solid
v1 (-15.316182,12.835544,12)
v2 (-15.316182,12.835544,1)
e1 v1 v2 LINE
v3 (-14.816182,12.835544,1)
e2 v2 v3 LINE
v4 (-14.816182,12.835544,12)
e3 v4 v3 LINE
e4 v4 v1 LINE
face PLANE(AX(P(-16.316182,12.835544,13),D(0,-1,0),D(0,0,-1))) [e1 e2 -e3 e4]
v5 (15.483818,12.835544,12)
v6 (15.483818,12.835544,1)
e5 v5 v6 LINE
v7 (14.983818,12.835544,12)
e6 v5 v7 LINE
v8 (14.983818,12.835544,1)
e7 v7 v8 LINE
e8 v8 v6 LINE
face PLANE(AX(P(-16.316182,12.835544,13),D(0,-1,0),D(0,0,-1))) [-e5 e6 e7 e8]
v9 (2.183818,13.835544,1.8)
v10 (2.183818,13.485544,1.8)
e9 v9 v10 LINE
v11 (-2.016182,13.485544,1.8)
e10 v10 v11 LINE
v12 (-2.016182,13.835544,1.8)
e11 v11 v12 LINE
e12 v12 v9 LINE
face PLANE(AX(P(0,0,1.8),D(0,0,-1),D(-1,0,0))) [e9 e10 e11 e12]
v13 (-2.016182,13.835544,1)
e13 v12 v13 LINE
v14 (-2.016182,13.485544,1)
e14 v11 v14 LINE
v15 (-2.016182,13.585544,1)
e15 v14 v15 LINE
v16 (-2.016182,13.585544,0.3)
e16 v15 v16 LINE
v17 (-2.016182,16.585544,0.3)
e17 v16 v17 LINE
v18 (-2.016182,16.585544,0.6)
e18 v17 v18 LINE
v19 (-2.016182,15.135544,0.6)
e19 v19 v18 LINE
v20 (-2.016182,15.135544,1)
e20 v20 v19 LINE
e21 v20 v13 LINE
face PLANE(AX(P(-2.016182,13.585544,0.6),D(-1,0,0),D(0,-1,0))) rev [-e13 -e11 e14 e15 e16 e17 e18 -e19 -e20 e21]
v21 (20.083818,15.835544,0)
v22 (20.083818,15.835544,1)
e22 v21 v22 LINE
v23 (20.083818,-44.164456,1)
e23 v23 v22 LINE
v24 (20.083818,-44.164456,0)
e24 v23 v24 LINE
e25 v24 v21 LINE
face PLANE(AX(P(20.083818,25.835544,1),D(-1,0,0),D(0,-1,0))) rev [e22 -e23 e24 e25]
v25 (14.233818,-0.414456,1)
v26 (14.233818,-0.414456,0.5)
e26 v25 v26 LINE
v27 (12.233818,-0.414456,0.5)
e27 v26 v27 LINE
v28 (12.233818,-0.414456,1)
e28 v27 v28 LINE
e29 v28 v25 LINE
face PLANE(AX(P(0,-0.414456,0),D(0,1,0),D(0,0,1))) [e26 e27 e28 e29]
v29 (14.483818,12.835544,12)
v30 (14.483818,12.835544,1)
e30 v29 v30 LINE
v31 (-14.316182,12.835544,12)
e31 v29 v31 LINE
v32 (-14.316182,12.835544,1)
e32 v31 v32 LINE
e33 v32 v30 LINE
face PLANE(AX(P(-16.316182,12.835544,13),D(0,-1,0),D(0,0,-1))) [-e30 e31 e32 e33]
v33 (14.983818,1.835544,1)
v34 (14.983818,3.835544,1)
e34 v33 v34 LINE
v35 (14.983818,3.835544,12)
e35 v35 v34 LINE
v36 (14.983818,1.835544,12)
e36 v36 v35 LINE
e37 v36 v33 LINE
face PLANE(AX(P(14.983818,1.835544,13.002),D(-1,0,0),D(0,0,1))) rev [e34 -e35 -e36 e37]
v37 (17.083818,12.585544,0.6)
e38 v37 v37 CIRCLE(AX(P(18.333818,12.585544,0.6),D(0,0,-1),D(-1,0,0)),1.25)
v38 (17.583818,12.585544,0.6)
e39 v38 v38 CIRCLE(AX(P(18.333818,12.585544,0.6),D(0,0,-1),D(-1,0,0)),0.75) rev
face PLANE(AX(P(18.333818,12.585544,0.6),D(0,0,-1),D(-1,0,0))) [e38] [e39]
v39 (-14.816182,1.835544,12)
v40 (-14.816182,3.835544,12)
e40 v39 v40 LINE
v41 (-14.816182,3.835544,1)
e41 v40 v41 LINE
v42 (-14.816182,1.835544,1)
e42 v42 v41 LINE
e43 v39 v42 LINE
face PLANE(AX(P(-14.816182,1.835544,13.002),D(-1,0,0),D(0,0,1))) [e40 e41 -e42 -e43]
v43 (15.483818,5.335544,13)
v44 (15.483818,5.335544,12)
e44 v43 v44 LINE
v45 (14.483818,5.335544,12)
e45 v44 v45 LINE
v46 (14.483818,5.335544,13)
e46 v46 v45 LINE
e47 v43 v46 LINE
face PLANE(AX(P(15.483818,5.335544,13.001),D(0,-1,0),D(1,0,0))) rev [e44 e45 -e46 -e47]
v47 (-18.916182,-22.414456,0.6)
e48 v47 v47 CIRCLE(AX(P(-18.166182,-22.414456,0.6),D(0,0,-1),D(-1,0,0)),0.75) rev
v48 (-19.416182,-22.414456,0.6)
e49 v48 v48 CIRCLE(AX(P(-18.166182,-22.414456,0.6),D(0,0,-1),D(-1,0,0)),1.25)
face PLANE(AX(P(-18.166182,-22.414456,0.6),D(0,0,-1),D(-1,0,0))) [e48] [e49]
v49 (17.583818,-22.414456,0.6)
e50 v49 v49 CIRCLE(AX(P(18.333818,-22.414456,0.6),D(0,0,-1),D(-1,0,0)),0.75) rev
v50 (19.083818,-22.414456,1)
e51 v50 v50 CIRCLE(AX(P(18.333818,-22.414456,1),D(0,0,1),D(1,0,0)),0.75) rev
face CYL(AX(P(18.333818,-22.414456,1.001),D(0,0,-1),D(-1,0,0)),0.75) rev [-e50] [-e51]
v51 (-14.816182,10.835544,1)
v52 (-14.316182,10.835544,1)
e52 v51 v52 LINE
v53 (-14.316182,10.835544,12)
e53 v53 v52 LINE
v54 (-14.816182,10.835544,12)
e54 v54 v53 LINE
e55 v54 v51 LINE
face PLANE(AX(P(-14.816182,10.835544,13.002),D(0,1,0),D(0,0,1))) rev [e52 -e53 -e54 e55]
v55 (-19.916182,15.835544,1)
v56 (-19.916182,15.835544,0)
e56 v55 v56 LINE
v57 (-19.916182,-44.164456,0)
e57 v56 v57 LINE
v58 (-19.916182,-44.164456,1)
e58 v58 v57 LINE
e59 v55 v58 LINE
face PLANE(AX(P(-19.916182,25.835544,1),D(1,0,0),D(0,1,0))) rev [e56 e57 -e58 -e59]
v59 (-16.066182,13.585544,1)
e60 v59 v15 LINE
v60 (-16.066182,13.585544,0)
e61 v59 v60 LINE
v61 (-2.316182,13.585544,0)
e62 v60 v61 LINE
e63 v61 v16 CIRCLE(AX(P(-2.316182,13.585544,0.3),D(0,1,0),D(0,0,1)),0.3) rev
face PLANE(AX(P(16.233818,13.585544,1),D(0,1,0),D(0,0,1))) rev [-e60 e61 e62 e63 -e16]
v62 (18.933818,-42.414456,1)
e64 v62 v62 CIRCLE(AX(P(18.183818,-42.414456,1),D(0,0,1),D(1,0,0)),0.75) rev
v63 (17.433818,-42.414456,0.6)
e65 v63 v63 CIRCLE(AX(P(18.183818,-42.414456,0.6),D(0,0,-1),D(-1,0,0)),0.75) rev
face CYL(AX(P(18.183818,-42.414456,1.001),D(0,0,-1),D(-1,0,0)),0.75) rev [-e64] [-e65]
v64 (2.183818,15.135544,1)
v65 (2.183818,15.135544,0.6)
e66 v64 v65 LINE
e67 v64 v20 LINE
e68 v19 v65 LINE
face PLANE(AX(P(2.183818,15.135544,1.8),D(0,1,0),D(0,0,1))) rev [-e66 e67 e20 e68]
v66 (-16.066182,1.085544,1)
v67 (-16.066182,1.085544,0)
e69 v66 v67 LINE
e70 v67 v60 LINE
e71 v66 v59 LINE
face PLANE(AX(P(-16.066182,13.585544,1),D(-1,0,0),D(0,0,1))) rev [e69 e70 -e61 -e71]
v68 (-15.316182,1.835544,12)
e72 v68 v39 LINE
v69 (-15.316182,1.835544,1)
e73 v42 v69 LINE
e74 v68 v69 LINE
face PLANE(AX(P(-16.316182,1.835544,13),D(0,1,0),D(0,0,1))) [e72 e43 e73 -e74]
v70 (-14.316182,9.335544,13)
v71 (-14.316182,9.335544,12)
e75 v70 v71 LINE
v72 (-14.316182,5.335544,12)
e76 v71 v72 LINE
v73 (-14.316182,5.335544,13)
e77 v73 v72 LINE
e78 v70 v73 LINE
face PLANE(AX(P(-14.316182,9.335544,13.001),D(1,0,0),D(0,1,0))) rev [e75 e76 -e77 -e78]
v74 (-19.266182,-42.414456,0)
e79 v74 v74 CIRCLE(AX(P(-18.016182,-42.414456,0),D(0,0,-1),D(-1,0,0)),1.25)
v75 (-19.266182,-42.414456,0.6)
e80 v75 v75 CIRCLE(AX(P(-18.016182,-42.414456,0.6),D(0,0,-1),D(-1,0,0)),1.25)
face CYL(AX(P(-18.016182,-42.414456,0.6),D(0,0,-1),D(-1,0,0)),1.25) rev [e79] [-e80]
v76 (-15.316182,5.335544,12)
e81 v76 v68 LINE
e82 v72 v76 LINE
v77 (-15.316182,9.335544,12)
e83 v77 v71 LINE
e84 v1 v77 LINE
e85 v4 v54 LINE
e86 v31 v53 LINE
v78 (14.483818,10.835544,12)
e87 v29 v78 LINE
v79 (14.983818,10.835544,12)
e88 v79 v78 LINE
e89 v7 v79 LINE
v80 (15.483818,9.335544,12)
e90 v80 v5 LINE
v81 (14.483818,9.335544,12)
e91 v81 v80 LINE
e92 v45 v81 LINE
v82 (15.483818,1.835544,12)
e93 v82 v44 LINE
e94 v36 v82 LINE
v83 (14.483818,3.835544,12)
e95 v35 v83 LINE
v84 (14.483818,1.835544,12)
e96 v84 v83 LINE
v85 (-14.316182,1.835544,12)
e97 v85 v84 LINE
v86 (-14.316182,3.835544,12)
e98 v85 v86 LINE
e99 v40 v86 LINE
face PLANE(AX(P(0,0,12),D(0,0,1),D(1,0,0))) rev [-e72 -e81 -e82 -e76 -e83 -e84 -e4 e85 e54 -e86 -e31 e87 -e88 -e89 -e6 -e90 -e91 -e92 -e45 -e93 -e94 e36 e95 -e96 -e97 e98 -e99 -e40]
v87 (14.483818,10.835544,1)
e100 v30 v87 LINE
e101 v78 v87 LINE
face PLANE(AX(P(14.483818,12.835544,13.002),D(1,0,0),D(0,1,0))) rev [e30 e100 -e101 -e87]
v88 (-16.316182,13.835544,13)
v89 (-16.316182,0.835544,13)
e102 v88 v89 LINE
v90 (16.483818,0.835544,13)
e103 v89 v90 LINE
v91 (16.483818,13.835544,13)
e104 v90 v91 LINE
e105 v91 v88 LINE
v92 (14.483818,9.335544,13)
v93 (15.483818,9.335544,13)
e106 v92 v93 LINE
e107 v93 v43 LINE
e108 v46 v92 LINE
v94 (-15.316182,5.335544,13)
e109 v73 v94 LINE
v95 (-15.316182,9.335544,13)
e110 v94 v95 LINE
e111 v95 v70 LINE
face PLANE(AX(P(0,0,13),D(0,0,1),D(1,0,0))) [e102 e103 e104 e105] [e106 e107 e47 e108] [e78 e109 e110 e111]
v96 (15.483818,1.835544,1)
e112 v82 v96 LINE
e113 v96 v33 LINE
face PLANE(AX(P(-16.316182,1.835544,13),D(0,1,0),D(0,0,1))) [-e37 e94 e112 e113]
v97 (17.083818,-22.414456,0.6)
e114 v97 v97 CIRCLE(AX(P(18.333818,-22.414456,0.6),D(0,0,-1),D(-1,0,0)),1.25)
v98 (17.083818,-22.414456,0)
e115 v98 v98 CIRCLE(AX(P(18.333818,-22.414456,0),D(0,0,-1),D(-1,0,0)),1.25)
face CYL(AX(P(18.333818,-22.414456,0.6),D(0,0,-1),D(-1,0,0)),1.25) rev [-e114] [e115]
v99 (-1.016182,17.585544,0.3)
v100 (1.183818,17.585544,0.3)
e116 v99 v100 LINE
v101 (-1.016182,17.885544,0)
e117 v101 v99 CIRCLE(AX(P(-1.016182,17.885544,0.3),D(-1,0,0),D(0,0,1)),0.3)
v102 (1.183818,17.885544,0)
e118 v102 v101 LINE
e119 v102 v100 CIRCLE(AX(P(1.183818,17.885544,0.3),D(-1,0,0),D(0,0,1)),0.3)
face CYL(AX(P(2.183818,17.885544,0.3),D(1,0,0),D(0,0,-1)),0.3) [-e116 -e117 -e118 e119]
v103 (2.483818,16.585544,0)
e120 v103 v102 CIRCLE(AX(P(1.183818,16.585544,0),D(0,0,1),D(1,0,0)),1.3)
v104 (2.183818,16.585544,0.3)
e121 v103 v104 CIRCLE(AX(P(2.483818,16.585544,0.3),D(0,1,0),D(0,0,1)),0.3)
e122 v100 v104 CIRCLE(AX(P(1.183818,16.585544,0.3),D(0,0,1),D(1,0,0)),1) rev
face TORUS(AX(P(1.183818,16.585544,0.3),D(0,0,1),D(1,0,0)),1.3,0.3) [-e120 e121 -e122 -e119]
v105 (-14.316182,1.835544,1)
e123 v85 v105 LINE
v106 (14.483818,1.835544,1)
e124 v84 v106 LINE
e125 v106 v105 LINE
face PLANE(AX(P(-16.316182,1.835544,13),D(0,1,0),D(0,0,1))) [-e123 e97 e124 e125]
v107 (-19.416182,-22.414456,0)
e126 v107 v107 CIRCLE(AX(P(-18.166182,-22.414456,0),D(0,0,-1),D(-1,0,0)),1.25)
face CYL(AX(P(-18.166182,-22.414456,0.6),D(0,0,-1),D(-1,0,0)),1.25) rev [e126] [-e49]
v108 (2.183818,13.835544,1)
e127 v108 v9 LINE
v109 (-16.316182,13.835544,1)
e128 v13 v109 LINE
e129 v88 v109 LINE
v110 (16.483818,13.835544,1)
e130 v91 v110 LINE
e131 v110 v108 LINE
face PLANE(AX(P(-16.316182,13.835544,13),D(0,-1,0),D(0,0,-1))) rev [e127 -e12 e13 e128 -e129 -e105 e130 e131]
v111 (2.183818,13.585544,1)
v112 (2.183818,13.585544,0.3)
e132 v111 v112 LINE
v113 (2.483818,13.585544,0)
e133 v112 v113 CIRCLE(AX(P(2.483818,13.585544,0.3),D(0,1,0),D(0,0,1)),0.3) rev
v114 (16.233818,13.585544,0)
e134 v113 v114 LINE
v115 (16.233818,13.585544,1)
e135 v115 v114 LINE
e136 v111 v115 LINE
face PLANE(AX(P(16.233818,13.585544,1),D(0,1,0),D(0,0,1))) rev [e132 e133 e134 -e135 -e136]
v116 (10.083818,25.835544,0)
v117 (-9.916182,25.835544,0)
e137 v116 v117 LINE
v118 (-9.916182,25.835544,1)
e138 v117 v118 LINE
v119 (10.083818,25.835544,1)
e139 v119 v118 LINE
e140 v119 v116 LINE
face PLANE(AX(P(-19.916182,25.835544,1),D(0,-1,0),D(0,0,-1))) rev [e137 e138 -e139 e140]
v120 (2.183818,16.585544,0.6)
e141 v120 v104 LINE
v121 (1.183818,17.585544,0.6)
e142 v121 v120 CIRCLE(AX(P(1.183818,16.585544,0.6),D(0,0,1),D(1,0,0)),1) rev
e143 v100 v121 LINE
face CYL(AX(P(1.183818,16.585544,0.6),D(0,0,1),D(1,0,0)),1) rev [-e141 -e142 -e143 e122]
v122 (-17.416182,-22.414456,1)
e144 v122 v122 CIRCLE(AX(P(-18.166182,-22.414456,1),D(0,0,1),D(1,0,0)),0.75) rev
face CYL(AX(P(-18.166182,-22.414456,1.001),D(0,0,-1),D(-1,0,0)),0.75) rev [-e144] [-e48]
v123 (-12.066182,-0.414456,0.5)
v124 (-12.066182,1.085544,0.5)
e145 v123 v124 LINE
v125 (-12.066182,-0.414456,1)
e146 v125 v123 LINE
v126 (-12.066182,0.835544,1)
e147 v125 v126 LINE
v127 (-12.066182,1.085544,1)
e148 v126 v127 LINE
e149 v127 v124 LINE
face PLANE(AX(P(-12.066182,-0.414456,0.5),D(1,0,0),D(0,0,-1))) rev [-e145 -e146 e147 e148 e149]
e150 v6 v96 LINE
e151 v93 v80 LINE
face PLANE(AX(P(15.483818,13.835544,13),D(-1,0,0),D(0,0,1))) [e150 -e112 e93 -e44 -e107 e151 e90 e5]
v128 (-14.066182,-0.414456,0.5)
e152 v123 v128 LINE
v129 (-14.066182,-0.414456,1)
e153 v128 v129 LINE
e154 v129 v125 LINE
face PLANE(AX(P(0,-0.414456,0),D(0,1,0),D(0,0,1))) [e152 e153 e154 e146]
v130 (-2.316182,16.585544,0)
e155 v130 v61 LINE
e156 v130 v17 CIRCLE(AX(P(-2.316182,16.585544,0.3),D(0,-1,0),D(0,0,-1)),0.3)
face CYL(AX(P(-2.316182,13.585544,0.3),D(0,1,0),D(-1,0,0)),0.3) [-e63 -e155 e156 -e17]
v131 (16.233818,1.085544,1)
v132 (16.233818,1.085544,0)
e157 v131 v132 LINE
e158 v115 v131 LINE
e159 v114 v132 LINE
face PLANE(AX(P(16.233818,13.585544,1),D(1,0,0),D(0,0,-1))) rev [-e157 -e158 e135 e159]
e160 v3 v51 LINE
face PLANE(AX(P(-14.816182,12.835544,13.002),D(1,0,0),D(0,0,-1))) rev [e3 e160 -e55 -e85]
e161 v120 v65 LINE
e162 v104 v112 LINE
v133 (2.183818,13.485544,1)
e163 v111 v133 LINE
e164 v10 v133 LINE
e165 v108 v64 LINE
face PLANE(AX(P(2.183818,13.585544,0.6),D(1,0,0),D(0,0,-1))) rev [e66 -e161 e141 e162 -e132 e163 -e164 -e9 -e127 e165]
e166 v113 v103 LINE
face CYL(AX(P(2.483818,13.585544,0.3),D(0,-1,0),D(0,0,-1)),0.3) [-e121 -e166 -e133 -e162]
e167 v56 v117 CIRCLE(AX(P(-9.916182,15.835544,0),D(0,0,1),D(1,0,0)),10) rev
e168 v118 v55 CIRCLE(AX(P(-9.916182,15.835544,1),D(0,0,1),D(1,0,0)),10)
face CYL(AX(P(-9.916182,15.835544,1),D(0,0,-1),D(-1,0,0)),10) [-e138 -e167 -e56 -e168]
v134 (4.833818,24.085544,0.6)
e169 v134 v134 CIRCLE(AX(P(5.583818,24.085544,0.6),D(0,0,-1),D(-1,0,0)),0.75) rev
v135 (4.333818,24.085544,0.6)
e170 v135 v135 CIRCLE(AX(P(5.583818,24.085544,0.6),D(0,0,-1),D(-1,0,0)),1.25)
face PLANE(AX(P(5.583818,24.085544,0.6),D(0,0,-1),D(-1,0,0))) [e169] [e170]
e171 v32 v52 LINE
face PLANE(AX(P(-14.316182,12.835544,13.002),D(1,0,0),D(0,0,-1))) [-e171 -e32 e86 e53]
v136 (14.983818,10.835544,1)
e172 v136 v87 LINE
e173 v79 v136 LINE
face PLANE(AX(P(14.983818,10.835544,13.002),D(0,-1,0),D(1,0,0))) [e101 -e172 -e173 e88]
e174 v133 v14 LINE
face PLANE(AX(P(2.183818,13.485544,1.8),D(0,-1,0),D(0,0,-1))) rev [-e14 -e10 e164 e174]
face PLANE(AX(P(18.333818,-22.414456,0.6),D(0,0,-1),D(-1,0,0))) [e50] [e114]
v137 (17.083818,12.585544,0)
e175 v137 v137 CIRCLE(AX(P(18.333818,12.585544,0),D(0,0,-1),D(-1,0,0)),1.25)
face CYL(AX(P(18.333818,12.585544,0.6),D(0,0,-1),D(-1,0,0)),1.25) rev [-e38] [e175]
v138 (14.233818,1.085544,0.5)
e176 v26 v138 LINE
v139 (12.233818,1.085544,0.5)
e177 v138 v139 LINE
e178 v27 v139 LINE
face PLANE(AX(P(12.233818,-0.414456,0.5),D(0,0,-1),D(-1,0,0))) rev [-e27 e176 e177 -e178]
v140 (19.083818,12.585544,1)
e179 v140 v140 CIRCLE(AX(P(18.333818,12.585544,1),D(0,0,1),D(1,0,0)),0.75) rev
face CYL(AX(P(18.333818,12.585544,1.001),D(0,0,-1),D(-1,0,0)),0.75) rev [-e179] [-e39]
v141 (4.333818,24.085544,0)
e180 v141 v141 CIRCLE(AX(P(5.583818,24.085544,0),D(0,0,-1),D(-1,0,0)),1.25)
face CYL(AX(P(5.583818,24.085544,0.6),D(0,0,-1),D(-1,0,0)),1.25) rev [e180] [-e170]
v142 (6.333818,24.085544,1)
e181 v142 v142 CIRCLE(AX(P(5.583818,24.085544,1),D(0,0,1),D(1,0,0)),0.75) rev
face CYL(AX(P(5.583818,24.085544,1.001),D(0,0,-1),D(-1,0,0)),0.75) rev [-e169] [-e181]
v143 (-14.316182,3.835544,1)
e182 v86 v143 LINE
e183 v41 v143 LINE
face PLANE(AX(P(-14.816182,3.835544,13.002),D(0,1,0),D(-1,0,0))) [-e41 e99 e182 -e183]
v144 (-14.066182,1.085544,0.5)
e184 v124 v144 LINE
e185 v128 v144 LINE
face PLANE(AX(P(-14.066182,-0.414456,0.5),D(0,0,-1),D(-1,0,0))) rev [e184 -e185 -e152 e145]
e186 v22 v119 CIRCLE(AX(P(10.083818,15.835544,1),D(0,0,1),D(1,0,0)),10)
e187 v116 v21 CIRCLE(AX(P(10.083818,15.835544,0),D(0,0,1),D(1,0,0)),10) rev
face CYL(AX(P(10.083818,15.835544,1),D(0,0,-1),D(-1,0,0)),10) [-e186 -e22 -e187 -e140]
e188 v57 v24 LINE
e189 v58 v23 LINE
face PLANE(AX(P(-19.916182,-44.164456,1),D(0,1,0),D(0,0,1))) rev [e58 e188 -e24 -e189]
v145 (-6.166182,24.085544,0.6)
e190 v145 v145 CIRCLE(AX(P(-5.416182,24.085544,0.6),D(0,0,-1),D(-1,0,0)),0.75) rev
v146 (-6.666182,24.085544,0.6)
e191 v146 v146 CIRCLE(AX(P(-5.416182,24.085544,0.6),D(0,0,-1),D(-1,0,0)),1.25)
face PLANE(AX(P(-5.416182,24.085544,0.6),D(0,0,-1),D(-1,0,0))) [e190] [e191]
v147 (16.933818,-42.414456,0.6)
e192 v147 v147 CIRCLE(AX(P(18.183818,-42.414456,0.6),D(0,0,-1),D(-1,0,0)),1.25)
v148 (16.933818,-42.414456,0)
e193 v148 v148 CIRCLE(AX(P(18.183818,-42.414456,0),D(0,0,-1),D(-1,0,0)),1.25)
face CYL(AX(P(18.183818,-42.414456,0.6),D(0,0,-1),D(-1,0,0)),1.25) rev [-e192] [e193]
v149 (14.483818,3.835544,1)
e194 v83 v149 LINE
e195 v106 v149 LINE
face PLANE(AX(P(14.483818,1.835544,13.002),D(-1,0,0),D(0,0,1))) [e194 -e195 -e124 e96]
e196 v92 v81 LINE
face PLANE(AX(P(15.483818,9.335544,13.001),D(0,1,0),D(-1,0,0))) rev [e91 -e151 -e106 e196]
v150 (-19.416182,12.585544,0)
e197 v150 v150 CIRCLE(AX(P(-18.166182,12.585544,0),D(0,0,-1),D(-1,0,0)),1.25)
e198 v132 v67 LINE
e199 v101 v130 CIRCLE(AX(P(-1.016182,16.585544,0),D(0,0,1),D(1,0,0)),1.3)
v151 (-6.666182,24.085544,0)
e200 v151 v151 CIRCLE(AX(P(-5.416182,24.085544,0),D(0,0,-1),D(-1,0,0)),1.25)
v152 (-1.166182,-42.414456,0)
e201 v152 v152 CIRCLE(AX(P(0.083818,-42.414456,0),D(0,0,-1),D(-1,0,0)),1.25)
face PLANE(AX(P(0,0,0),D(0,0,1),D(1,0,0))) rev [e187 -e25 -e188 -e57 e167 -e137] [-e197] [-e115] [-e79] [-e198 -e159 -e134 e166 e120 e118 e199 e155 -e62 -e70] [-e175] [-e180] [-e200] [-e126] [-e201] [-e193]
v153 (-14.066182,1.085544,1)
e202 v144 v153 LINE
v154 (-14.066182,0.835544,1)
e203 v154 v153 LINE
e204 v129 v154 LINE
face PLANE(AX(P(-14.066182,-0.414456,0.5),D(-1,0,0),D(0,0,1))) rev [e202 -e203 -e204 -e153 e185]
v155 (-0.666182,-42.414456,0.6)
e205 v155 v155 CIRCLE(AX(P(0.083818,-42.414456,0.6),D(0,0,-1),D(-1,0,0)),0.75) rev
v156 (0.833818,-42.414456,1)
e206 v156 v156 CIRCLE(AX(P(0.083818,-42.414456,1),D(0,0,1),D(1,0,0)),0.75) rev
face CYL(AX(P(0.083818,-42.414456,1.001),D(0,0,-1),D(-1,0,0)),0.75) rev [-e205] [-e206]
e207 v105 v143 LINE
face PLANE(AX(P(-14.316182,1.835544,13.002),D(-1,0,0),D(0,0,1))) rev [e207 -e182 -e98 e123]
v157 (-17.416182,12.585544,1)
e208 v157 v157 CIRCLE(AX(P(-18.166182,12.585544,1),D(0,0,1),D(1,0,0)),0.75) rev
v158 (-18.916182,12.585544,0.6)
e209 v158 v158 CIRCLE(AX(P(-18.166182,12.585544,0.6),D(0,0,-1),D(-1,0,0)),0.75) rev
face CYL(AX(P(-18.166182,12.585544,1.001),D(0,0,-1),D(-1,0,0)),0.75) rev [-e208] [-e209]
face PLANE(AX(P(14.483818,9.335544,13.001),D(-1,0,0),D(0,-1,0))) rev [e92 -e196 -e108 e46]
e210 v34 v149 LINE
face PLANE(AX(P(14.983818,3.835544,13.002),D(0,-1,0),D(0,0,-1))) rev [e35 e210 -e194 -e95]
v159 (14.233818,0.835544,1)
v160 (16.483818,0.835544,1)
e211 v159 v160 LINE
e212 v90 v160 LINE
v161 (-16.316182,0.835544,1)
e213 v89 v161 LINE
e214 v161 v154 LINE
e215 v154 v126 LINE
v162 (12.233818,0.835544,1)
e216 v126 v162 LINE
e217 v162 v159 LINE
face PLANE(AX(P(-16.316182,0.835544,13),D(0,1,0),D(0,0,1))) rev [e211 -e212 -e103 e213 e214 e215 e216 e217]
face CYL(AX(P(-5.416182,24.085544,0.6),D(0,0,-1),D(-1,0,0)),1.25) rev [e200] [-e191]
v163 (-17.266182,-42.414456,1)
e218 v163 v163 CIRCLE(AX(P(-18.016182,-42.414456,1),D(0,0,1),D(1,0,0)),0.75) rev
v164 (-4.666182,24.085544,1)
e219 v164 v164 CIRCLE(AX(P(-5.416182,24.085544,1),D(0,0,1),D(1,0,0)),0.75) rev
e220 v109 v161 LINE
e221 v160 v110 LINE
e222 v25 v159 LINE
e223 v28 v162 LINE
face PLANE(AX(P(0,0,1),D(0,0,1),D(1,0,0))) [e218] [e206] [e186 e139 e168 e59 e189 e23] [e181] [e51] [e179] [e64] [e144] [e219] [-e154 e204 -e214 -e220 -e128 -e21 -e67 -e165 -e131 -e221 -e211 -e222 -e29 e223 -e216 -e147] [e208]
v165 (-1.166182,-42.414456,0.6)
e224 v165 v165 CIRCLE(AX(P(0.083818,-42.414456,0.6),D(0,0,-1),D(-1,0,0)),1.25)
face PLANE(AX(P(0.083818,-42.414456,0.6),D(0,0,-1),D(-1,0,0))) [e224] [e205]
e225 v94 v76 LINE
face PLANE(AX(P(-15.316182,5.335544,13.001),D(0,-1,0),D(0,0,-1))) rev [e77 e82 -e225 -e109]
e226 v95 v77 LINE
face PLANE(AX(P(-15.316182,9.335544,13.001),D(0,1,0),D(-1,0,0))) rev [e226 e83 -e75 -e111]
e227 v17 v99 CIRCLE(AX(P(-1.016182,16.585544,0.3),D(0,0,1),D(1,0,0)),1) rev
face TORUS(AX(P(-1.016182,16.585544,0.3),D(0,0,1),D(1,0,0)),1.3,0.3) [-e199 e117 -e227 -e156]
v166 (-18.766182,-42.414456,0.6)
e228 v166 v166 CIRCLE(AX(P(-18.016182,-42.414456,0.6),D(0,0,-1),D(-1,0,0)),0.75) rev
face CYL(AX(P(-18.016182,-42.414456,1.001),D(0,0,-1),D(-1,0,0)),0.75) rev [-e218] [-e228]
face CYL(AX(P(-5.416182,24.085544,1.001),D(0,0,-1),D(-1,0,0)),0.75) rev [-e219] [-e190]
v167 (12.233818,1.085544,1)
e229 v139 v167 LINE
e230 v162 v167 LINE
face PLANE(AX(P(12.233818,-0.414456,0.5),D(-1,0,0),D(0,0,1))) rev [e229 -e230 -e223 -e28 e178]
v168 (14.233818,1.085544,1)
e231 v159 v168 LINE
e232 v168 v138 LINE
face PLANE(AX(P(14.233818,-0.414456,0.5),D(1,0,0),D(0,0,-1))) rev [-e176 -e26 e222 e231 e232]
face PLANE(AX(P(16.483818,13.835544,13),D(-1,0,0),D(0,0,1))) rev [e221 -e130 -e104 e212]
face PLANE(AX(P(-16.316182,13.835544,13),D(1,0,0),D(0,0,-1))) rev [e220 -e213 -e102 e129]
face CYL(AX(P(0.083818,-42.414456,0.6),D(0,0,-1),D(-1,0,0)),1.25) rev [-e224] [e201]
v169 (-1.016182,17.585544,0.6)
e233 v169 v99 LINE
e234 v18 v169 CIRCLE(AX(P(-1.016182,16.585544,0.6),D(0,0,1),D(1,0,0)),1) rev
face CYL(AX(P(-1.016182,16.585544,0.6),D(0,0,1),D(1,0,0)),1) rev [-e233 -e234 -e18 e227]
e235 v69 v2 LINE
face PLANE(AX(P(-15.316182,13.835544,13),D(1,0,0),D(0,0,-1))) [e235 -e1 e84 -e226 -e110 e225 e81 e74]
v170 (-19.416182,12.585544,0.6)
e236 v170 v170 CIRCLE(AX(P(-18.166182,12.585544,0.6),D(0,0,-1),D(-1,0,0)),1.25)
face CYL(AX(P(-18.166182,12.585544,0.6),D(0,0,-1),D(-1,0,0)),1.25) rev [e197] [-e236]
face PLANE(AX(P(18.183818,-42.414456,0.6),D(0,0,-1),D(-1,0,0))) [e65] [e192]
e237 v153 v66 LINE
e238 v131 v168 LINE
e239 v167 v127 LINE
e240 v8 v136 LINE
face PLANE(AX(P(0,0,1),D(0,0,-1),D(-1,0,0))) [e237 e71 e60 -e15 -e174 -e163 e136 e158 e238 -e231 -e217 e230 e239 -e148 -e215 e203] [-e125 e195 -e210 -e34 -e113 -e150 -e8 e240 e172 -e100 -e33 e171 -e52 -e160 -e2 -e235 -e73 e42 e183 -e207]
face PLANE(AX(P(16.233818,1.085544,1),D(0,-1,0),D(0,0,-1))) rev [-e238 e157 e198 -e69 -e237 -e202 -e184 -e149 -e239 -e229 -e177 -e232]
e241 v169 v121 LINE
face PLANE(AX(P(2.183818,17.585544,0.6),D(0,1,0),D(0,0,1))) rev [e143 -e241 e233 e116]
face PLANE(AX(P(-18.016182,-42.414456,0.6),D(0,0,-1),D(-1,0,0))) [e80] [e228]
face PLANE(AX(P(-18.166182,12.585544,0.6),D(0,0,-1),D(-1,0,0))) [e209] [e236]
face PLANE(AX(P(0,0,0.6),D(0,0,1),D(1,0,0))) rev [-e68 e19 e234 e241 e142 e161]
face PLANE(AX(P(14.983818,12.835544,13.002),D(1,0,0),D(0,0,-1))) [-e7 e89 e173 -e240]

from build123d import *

# Parameters (mm, degrees)
CROQUIS1_W              = 40
CROQUIS1_H              = 70
SALIENTE_EXTRUIR1_DEPTH = 1
REDONDEO1_R             = 10
CORTAR_EXTRUIR1_REACH   = 50.527
CROQUIS2_R              = 0.75
CROQUIS5_W              = 32.8
CROQUIS5_H              = 13
SALIENTE_EXTRUIR2_DEPTH = 12
VACIADO1_START          = -15.316182085
VACIADO1_OUTLINE_W      = 11
VACIADO1_OUTLINE_H      = 12
VACIADO1_DEPTH          = 30.8
CORTAR_EXTRUIR4_REACH   = 51.979
CROQUIS6_W              = 1
CROQUIS6_H              = 4
CROQUIS7_W              = 32.3
CROQUIS7_H              = 12.5
CORTAR_EXTRUIR5_DEPTH   = 1
CROQUIS8_W              = 4.2
CROQUIS8_H              = 4
CORTAR_EXTRUIR6_DEPTH   = 0.6
REDONDEO2_R             = 1
REDONDEO3_R             = 0.3
CROQUIS9_W              = 4.2
CROQUIS9_H              = 1.65
CORTAR_EXTRUIR7_DEPTH   = 1.2
CROQUIS10_W             = 2
CROQUIS10_H             = 0.5
CORTAR_EXTRUIR8_DEPTH   = 1.5
CROQUIS11_R             = 1.25
CORTAR_EXTRUIR9_DEPTH   = 0.6
SALIENTE_EXTRUIR3_REACH = 51.979
CROQUIS12_W             = 0.5
CROQUIS12_H             = 2


# Read off the part's stored shape, not the designer's step: Vaciado1
with BuildPart() as part:
    # Croquis1 → Saliente-Extruir1 (new body)
    with BuildSketch(Plane.XY):
        with Locations((0.083817915, -9.164456233)):
            Rectangle(CROQUIS1_W, CROQUIS1_H)
    extrude(amount=SALIENTE_EXTRUIR1_DEPTH)

    # Redondeo1
    redondeo1_edges = [part.edges().sort_by_distance(p)[0] for p in [
        (-19.916182085, 25.835543767, 0.5),
        (20.083817915, 25.835543767, 0.5),
    ]]
    fillet(redondeo1_edges, radius=REDONDEO1_R)

    # Croquis2 → Cortar-Extruir1 (cut, up to next)
    with BuildSketch(Plane(origin=(0, 0, 0), x_dir=(-1, 0, 0), z_dir=(0, 0, -1)), mode=Mode.PRIVATE) as cortar_extruir1_sk1:
        with Locations((-5.583817915, 24.085543767)):
            Circle(CROQUIS2_R)
    cortar_extruir1_tool1 = extrude(cortar_extruir1_sk1.sketch, amount=-CORTAR_EXTRUIR1_REACH, mode=Mode.PRIVATE) & part.part
    # Croquis2 → Cortar-Extruir1 (cut, up to next)
    with BuildSketch(Plane(origin=(0, 0, 0), x_dir=(-1, 0, 0), z_dir=(0, 0, -1)), mode=Mode.PRIVATE) as cortar_extruir1_sk2:
        with Locations((5.416182085, 24.085543767)):
            Circle(CROQUIS2_R)
    cortar_extruir1_tool2 = extrude(cortar_extruir1_sk2.sketch, amount=-CORTAR_EXTRUIR1_REACH, mode=Mode.PRIVATE) & part.part
    # Croquis2 → Cortar-Extruir1 (cut, up to next)
    with BuildSketch(Plane(origin=(0, 0, 0), x_dir=(-1, 0, 0), z_dir=(0, 0, -1)), mode=Mode.PRIVATE) as cortar_extruir1_sk3:
        with Locations((-18.183817915, -42.414456233)):
            Circle(CROQUIS2_R)
    cortar_extruir1_tool3 = extrude(cortar_extruir1_sk3.sketch, amount=-CORTAR_EXTRUIR1_REACH, mode=Mode.PRIVATE) & part.part
    # Croquis2 → Cortar-Extruir1 (cut, up to next)
    with BuildSketch(Plane(origin=(0, 0, 0), x_dir=(-1, 0, 0), z_dir=(0, 0, -1)), mode=Mode.PRIVATE) as cortar_extruir1_sk4:
        with Locations((-0.083817915, -42.414456233)):
            Circle(CROQUIS2_R)
    cortar_extruir1_tool4 = extrude(cortar_extruir1_sk4.sketch, amount=-CORTAR_EXTRUIR1_REACH, mode=Mode.PRIVATE) & part.part
    # Croquis2 → Cortar-Extruir1 (cut, up to next)
    with BuildSketch(Plane(origin=(0, 0, 0), x_dir=(-1, 0, 0), z_dir=(0, 0, -1)), mode=Mode.PRIVATE) as cortar_extruir1_sk5:
        with Locations((18.016182085, -42.414456233)):
            Circle(CROQUIS2_R)
    cortar_extruir1_tool5 = extrude(cortar_extruir1_sk5.sketch, amount=-CORTAR_EXTRUIR1_REACH, mode=Mode.PRIVATE) & part.part
    # Croquis2 → Cortar-Extruir1 (cut, up to next)
    with BuildSketch(Plane(origin=(0, 0, 0), x_dir=(-1, 0, 0), z_dir=(0, 0, -1)), mode=Mode.PRIVATE) as cortar_extruir1_sk6:
        with Locations((-18.333817915, 12.585543767)):
            Circle(CROQUIS2_R)
    cortar_extruir1_tool6 = extrude(cortar_extruir1_sk6.sketch, amount=-CORTAR_EXTRUIR1_REACH, mode=Mode.PRIVATE) & part.part
    # Croquis2 → Cortar-Extruir1 (cut, up to next)
    with BuildSketch(Plane(origin=(0, 0, 0), x_dir=(-1, 0, 0), z_dir=(0, 0, -1)), mode=Mode.PRIVATE) as cortar_extruir1_sk7:
        with Locations((-18.333817915, -22.414456233)):
            Circle(CROQUIS2_R)
    cortar_extruir1_tool7 = extrude(cortar_extruir1_sk7.sketch, amount=-CORTAR_EXTRUIR1_REACH, mode=Mode.PRIVATE) & part.part
    # Croquis2 → Cortar-Extruir1 (cut, up to next)
    with BuildSketch(Plane(origin=(0, 0, 0), x_dir=(-1, 0, 0), z_dir=(0, 0, -1)), mode=Mode.PRIVATE) as cortar_extruir1_sk8:
        with Locations((18.166182085, 12.585543767)):
            Circle(CROQUIS2_R)
    cortar_extruir1_tool8 = extrude(cortar_extruir1_sk8.sketch, amount=-CORTAR_EXTRUIR1_REACH, mode=Mode.PRIVATE) & part.part
    # Croquis2 → Cortar-Extruir1 (cut, up to next)
    with BuildSketch(Plane(origin=(0, 0, 0), x_dir=(-1, 0, 0), z_dir=(0, 0, -1)), mode=Mode.PRIVATE) as cortar_extruir1_sk9:
        with Locations((18.166182085, -22.414456233)):
            Circle(CROQUIS2_R)
    cortar_extruir1_tool9 = extrude(cortar_extruir1_sk9.sketch, amount=-CORTAR_EXTRUIR1_REACH, mode=Mode.PRIVATE) & part.part
    add(cortar_extruir1_tool1.solids().sort_by_distance((5.583818, 24.085544, 0))[0], mode=Mode.SUBTRACT)
    add(cortar_extruir1_tool2.solids().sort_by_distance((-5.416182, 24.085544, 0))[0], mode=Mode.SUBTRACT)
    add(cortar_extruir1_tool3.solids().sort_by_distance((18.183818, -42.414456, 0))[0], mode=Mode.SUBTRACT)
    add(cortar_extruir1_tool4.solids().sort_by_distance((0.083818, -42.414456, 0))[0], mode=Mode.SUBTRACT)
    add(cortar_extruir1_tool5.solids().sort_by_distance((-18.016182, -42.414456, 0))[0], mode=Mode.SUBTRACT)
    add(cortar_extruir1_tool6.solids().sort_by_distance((18.333818, 12.585544, 0))[0], mode=Mode.SUBTRACT)
    add(cortar_extruir1_tool7.solids().sort_by_distance((18.333818, -22.414456, 0))[0], mode=Mode.SUBTRACT)
    add(cortar_extruir1_tool8.solids().sort_by_distance((-18.166182, 12.585544, 0))[0], mode=Mode.SUBTRACT)
    add(cortar_extruir1_tool9.solids().sort_by_distance((-18.166182, -22.414456, 0))[0], mode=Mode.SUBTRACT)

    # Croquis5 → Saliente-Extruir2 (add)
    with BuildSketch(Plane.XY.offset(1)):
        with Locations((0.083817915, 7.335543767)):
            Rectangle(CROQUIS5_W, CROQUIS5_H)
    extrude(amount=SALIENTE_EXTRUIR2_DEPTH)

    # Vaciado1 outline → Vaciado1 (cut)
    with BuildSketch(Plane.YZ.offset(VACIADO1_START)):
        with Locations((7.335543767, 6)):
            Rectangle(VACIADO1_OUTLINE_W, VACIADO1_OUTLINE_H)
    extrude(amount=VACIADO1_DEPTH, mode=Mode.SUBTRACT)

    # Croquis6 → Cortar-Extruir4 (cut, up to next)
    with BuildSketch(Plane(origin=(0, 0, 12), x_dir=(-1, 0, 0), z_dir=(0, 0, -1)), mode=Mode.PRIVATE) as cortar_extruir4_sk1:
        with Locations((-14.983817915, 7.335543767)):
            Rectangle(CROQUIS6_W, CROQUIS6_H)
    cortar_extruir4_tool1 = extrude(cortar_extruir4_sk1.sketch, amount=-CORTAR_EXTRUIR4_REACH, mode=Mode.PRIVATE) & part.part
    # Croquis6 → Cortar-Extruir4 (cut, up to next)
    with BuildSketch(Plane(origin=(0, 0, 12), x_dir=(-1, 0, 0), z_dir=(0, 0, -1)), mode=Mode.PRIVATE) as cortar_extruir4_sk2:
        with Locations((14.816182085, 7.335543767)):
            Rectangle(CROQUIS6_W, CROQUIS6_H)
    cortar_extruir4_tool2 = extrude(cortar_extruir4_sk2.sketch, amount=-CORTAR_EXTRUIR4_REACH, mode=Mode.PRIVATE) & part.part
    add(cortar_extruir4_tool1.solids().sort_by_distance((14.983818, 7.335544, 12))[0], mode=Mode.SUBTRACT)
    add(cortar_extruir4_tool2.solids().sort_by_distance((-14.816182, 7.335544, 12))[0], mode=Mode.SUBTRACT)

    # Croquis7 → Cortar-Extruir5 (cut)
    with BuildSketch(Plane(origin=(0, 0, 0), x_dir=(-1, 0, 0), z_dir=(0, 0, -1))):
        with Locations((-0.083817915, 7.335543767)):
            Rectangle(CROQUIS7_W, CROQUIS7_H)
    extrude(amount=-CORTAR_EXTRUIR5_DEPTH, mode=Mode.SUBTRACT)

    # Croquis8 → Cortar-Extruir6 (cut)
    with BuildSketch(Plane(origin=(0, 0, 0), x_dir=(-1, 0, 0), z_dir=(0, 0, -1))):
        with Locations((-0.083817915, 15.585543767)):
            Rectangle(CROQUIS8_W, CROQUIS8_H)
    extrude(amount=-CORTAR_EXTRUIR6_DEPTH, mode=Mode.SUBTRACT)

    # Redondeo2
    redondeo2_edges = [part.edges().sort_by_distance(p)[0] for p in [
        (2.183817915, 17.585543767, 0.3),
        (-2.016182085, 17.585543767, 0.3),
    ]]
    fillet(redondeo2_edges, radius=REDONDEO2_R)

    # Redondeo3
    redondeo3_edges = [part.edges().sort_by_distance(p)[0] for p in [
        (-2.016182085, 15.085543767, 0),
        (0.083817915, 17.585543767, 0),
        (2.183817915, 15.085543767, 0),
        (-1.723288867, 17.292650548, 0),
        (1.890924696, 17.292650548, 0),
    ]]
    fillet(redondeo3_edges, radius=REDONDEO3_R)

    # Croquis9 → Cortar-Extruir7 (cut)
    with BuildSketch(Plane(origin=(0, 0, 0.6), x_dir=(-1, 0, 0), z_dir=(0, 0, -1))):
        with Locations((-0.083817915, 14.310543767)):
            Rectangle(CROQUIS9_W, CROQUIS9_H)
    extrude(amount=-CORTAR_EXTRUIR7_DEPTH, mode=Mode.SUBTRACT)

    # Croquis10 → Cortar-Extruir8 (cut)
    with BuildSketch(Plane(origin=(0, 1.085543767, 0), x_dir=(1, 0, 0), z_dir=(0, 1, 0))):
        with Locations((-13.066182085, -0.75)):
            Rectangle(CROQUIS10_W, CROQUIS10_H)
        with Locations((13.233817915, -0.75)):
            Rectangle(CROQUIS10_W, CROQUIS10_H)
    extrude(amount=-CORTAR_EXTRUIR8_DEPTH, mode=Mode.SUBTRACT)

    # Croquis11 → Cortar-Extruir9 (cut)
    with BuildSketch(Plane(origin=(0, 0, 0), x_dir=(-1, 0, 0), z_dir=(0, 0, -1))):
        with Locations((-5.583817915, 24.085543767)):
            Circle(CROQUIS11_R)
        with Locations((5.416182085, 24.085543767)):
            Circle(CROQUIS11_R)
        with Locations((18.166182085, 12.585543767)):
            Circle(CROQUIS11_R)
        with Locations((-18.333817915, 12.585543767)):
            Circle(CROQUIS11_R)
        with Locations((-18.333817915, -22.414456233)):
            Circle(CROQUIS11_R)
        with Locations((18.166182085, -22.414456233)):
            Circle(CROQUIS11_R)
        with Locations((18.016182085, -42.414456233)):
            Circle(CROQUIS11_R)
        with Locations((-0.083817915, -42.414456233)):
            Circle(CROQUIS11_R)
        with Locations((-18.183817915, -42.414456233)):
            Circle(CROQUIS11_R)
    extrude(amount=-CORTAR_EXTRUIR9_DEPTH, mode=Mode.SUBTRACT)

    # Croquis12 → Saliente-Extruir3 (add, up to next)
    with BuildSketch(Plane(origin=(0, 0, 1), x_dir=(-1, 0, 0), z_dir=(0, 0, -1)), mode=Mode.PRIVATE) as saliente_extruir3_sk1:
        with Locations((-14.733817915, 11.835543767)):
            Rectangle(CROQUIS12_W, CROQUIS12_H)
    saliente_extruir3_tool1 = extrude(saliente_extruir3_sk1.sketch, amount=-SALIENTE_EXTRUIR3_REACH, mode=Mode.PRIVATE) - part.part
    # Croquis12 → Saliente-Extruir3 (add, up to next)
    with BuildSketch(Plane(origin=(0, 0, 1), x_dir=(-1, 0, 0), z_dir=(0, 0, -1)), mode=Mode.PRIVATE) as saliente_extruir3_sk2:
        with Locations((-14.733817915, 2.835543767)):
            Rectangle(CROQUIS12_W, CROQUIS12_H)
    saliente_extruir3_tool2 = extrude(saliente_extruir3_sk2.sketch, amount=-SALIENTE_EXTRUIR3_REACH, mode=Mode.PRIVATE) - part.part
    # Croquis12 → Saliente-Extruir3 (add, up to next)
    with BuildSketch(Plane(origin=(0, 0, 1), x_dir=(-1, 0, 0), z_dir=(0, 0, -1)), mode=Mode.PRIVATE) as saliente_extruir3_sk3:
        with Locations((14.566182085, 11.835543767)):
            Rectangle(CROQUIS12_W, CROQUIS12_H)
    saliente_extruir3_tool3 = extrude(saliente_extruir3_sk3.sketch, amount=-SALIENTE_EXTRUIR3_REACH, mode=Mode.PRIVATE) - part.part
    # Croquis12 → Saliente-Extruir3 (add, up to next)
    with BuildSketch(Plane(origin=(0, 0, 1), x_dir=(-1, 0, 0), z_dir=(0, 0, -1)), mode=Mode.PRIVATE) as saliente_extruir3_sk4:
        with Locations((14.566182085, 2.835543767)):
            Rectangle(CROQUIS12_W, CROQUIS12_H)
    saliente_extruir3_tool4 = extrude(saliente_extruir3_sk4.sketch, amount=-SALIENTE_EXTRUIR3_REACH, mode=Mode.PRIVATE) - part.part
    add(saliente_extruir3_tool1.solids().sort_by_distance((14.733818, 11.835544, 1))[0])
    add(saliente_extruir3_tool2.solids().sort_by_distance((14.733818, 2.835544, 1))[0])
    add(saliente_extruir3_tool3.solids().sort_by_distance((-14.566182, 11.835544, 1))[0])
    add(saliente_extruir3_tool4.solids().sort_by_distance((-14.566182, 2.835544, 1))[0])


solid = part.part
